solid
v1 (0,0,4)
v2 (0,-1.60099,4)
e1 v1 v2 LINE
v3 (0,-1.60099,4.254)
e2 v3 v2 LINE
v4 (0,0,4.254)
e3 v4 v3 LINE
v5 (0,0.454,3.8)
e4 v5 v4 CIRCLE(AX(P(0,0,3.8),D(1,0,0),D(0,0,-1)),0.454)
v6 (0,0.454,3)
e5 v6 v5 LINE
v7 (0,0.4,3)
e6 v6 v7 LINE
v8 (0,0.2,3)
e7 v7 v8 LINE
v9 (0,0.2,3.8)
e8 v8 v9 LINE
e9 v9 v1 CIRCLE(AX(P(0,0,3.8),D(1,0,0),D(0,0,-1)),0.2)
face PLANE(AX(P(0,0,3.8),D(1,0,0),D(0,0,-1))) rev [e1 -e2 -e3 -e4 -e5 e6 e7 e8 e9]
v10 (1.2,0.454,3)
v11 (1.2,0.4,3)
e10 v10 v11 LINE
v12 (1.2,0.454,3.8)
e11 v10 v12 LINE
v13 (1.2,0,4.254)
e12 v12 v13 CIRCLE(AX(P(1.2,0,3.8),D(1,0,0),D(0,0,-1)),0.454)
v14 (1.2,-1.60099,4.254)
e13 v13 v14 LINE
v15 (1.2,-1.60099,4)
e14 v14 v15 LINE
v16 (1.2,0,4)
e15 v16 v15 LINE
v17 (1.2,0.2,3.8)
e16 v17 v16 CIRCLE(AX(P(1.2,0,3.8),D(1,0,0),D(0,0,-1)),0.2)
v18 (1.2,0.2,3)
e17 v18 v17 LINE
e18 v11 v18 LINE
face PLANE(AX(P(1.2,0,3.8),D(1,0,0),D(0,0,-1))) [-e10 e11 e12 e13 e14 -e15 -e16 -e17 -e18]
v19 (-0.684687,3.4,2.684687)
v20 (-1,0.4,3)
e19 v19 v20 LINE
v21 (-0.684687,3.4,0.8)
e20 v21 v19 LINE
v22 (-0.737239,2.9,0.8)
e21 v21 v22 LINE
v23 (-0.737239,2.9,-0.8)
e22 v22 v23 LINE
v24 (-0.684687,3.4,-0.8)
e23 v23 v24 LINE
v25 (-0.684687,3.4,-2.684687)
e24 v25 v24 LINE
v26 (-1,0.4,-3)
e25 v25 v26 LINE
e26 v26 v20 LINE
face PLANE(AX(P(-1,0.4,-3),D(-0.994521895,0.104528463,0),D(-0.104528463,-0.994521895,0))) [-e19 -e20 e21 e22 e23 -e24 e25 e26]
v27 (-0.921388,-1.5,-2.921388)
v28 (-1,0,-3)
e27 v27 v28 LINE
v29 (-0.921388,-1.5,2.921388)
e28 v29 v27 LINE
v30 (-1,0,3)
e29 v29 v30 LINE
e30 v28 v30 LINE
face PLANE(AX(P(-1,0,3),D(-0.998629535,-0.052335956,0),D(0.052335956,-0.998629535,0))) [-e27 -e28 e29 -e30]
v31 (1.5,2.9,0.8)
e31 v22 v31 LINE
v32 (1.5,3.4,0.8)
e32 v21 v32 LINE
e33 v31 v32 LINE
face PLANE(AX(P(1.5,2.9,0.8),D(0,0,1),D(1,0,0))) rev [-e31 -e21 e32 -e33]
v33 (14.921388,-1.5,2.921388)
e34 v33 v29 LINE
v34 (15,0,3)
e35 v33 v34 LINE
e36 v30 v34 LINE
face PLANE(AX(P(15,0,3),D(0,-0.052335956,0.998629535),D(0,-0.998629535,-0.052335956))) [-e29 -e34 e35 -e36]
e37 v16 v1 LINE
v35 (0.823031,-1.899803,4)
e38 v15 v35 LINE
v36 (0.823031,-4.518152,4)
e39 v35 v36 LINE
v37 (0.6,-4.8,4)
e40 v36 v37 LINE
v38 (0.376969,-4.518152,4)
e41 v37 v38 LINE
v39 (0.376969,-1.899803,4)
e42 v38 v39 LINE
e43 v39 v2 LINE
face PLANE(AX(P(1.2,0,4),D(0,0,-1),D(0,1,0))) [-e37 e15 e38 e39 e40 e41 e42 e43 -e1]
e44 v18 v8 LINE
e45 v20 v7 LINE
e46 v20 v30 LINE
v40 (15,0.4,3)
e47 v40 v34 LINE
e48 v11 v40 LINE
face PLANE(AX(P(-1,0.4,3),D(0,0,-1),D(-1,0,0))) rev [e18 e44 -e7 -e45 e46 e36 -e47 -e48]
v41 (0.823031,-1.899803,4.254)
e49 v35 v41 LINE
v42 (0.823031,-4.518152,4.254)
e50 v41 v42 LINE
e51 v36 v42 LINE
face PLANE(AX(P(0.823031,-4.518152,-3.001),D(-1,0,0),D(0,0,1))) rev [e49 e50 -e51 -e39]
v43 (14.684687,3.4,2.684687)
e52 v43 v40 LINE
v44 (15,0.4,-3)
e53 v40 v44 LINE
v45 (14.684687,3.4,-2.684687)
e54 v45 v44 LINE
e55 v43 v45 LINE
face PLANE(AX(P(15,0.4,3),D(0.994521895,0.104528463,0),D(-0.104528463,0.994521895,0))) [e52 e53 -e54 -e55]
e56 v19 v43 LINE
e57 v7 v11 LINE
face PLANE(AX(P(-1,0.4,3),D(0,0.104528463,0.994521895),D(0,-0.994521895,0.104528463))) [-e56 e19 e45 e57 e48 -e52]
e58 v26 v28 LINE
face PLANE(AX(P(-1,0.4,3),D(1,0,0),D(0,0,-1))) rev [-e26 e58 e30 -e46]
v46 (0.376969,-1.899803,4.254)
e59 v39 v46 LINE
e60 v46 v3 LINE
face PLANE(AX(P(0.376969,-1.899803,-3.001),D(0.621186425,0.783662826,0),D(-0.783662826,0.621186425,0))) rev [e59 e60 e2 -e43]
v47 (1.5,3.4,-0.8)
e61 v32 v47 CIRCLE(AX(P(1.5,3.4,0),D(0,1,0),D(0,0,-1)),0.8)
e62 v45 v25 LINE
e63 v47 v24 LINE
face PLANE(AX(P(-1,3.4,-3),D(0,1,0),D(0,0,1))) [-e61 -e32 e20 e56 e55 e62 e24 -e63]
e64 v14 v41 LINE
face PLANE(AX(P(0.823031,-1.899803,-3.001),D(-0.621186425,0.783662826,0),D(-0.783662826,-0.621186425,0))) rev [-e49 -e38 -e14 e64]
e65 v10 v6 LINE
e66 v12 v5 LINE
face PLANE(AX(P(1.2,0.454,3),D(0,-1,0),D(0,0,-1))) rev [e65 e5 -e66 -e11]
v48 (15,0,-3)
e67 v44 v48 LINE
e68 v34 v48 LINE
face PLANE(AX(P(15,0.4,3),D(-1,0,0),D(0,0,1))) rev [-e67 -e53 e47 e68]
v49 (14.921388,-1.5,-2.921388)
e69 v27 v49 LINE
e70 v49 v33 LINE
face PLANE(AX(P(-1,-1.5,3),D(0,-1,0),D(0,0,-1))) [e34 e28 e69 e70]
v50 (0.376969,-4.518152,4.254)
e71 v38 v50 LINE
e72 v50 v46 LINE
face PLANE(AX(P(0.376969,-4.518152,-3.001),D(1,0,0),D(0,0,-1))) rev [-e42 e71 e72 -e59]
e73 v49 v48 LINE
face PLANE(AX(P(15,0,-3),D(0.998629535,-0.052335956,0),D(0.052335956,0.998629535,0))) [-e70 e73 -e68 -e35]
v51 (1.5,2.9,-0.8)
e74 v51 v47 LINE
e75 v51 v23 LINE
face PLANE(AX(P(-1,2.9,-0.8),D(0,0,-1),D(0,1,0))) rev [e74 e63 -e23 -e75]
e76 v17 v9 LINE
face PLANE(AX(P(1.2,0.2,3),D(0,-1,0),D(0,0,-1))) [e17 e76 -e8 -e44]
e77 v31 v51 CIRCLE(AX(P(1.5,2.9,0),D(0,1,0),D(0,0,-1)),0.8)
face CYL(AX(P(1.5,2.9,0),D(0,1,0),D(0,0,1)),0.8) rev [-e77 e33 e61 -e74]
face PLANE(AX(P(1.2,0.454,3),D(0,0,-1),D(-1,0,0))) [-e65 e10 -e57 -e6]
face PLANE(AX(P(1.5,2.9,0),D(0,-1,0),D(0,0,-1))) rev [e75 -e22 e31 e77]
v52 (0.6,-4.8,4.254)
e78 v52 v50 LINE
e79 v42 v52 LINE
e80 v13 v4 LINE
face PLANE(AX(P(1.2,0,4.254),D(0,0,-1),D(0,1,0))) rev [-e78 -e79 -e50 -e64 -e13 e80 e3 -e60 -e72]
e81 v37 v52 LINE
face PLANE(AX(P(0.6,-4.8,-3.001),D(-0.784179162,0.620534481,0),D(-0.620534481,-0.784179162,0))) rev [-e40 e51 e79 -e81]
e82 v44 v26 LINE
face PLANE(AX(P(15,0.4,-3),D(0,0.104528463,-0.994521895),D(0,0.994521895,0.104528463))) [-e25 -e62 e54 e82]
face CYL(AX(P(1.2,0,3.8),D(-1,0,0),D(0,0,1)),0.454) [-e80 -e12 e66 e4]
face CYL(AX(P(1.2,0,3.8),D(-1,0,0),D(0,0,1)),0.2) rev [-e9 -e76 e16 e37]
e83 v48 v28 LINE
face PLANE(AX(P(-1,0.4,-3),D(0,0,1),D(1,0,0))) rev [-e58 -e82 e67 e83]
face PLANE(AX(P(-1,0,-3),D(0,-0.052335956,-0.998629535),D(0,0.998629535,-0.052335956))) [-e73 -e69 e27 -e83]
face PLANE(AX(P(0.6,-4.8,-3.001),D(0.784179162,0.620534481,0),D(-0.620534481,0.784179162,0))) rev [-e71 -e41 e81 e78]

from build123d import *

# Parameters (mm, degrees)
SKETCH_1_W          = 16
SKETCH_1_H          = 6
EXTRUDE_1_DEPTH     = 0.4
SKETCH_2_W          = 16
SKETCH_2_H          = 6
EXTRUDE_2_DEPTH     = 3
EXTRUDE_2_TAPER     = 6
SKETCH_3_W          = 16
SKETCH_3_H          = 6
EXTRUDE_3_DEPTH     = 1.5
EXTRUDE_3_TAPER     = 3
CUT_EXTRUDE_4_DEPTH = 0.5
EXTRUDE_1_2_DEPTH   = 1.2
CUT_EXTRUDE_START   = -0.254
CUT_EXTRUDE_5_DEPTH = 0.254


# Read off the part's stored shape, not the designer's step: 伸長-薄件1
with BuildPart() as part:
    # 草圖1 → Extrude 1 (new body)
    with BuildSketch(Plane(origin=(0, 0, 0), x_dir=(1, 0, 0), z_dir=(0, 1, 0))):
        with Locations((7, 0)):
            Rectangle(SKETCH_1_W, SKETCH_1_H)
    extrude(amount=EXTRUDE_1_DEPTH)

    # 草圖2 → 伸長2 (add)
    with BuildSketch(Plane(origin=(0, 0.4, 0), x_dir=(1, 0, 0), z_dir=(0, 1, 0))):
        with Locations((7, 0)):
            Rectangle(SKETCH_2_W, SKETCH_2_H)
    extrude(amount=EXTRUDE_2_DEPTH, taper=EXTRUDE_2_TAPER)

    # 草圖3 → 伸長3 (add)
    with BuildSketch(Plane(origin=(0, 0, 0), x_dir=(-1, 0, 0), z_dir=(0, -1, 0))):
        with Locations((-7, 0)):
            Rectangle(SKETCH_3_W, SKETCH_3_H)
    extrude(amount=EXTRUDE_3_DEPTH, taper=EXTRUDE_3_TAPER)

    # 草圖4 → 伸長4 (cut)
    with BuildSketch(Plane(origin=(0, 3.4, 0), x_dir=(1, 0, 0), z_dir=(0, 1, 0))):
        with BuildLine():
            Line((-1, 0.8), (1.5, 0.8))
            ThreePointArc((1.5, 0.8), (2.3, 0), (1.5, -0.8))
            Line((1.5, -0.8), (-1, -0.8))
            Line((-1, -0.8), (-1, 0.8))
        make_face()
    extrude(amount=-CUT_EXTRUDE_4_DEPTH, mode=Mode.SUBTRACT)

    # Extrude 1 2 outline → Extrude 1 2 (add)
    with BuildSketch(Plane(origin=(0, 0, 0), x_dir=(0, 0, -1), z_dir=(1, 0, 0))):
        with BuildLine():
            Line((-3, 0.2), (-3, 0.454))
            Line((-3, 0.454), (-3.8, 0.454))
            ThreePointArc((-3.8, 0.454), (-4.121026479, 0.321026479), (-4.254, 0))
            Line((-4.254, 0), (-4.254, -4.8))
            Line((-4.254, -4.8), (-4, -4.8))
            Line((-4, -4.8), (-4, 0))
            ThreePointArc((-4, 0), (-3.941421356, 0.141421356), (-3.8, 0.2))
            Line((-3.8, 0.2), (-3, 0.2))
        make_face()
    extrude(amount=EXTRUDE_1_2_DEPTH)

    # 草圖6 → 伸長5 (cut)
    with BuildSketch(Plane.XY.offset(4.254).offset(CUT_EXTRUDE_START)):
        Polygon((0.6, -4.8), (0.823031072, -4.518152134), (0.823031072, -1.899802565), (1.593384633, -1.289166003), (1.593384633, -5.180880526), (-0.393384633, -5.180880526), (-0.393384633, -1.289166003), (0.376968928, -1.899802565), (0.376968928, -4.518152134), align=None)
    extrude(amount=CUT_EXTRUDE_5_DEPTH, mode=Mode.SUBTRACT)


solid = part.part
